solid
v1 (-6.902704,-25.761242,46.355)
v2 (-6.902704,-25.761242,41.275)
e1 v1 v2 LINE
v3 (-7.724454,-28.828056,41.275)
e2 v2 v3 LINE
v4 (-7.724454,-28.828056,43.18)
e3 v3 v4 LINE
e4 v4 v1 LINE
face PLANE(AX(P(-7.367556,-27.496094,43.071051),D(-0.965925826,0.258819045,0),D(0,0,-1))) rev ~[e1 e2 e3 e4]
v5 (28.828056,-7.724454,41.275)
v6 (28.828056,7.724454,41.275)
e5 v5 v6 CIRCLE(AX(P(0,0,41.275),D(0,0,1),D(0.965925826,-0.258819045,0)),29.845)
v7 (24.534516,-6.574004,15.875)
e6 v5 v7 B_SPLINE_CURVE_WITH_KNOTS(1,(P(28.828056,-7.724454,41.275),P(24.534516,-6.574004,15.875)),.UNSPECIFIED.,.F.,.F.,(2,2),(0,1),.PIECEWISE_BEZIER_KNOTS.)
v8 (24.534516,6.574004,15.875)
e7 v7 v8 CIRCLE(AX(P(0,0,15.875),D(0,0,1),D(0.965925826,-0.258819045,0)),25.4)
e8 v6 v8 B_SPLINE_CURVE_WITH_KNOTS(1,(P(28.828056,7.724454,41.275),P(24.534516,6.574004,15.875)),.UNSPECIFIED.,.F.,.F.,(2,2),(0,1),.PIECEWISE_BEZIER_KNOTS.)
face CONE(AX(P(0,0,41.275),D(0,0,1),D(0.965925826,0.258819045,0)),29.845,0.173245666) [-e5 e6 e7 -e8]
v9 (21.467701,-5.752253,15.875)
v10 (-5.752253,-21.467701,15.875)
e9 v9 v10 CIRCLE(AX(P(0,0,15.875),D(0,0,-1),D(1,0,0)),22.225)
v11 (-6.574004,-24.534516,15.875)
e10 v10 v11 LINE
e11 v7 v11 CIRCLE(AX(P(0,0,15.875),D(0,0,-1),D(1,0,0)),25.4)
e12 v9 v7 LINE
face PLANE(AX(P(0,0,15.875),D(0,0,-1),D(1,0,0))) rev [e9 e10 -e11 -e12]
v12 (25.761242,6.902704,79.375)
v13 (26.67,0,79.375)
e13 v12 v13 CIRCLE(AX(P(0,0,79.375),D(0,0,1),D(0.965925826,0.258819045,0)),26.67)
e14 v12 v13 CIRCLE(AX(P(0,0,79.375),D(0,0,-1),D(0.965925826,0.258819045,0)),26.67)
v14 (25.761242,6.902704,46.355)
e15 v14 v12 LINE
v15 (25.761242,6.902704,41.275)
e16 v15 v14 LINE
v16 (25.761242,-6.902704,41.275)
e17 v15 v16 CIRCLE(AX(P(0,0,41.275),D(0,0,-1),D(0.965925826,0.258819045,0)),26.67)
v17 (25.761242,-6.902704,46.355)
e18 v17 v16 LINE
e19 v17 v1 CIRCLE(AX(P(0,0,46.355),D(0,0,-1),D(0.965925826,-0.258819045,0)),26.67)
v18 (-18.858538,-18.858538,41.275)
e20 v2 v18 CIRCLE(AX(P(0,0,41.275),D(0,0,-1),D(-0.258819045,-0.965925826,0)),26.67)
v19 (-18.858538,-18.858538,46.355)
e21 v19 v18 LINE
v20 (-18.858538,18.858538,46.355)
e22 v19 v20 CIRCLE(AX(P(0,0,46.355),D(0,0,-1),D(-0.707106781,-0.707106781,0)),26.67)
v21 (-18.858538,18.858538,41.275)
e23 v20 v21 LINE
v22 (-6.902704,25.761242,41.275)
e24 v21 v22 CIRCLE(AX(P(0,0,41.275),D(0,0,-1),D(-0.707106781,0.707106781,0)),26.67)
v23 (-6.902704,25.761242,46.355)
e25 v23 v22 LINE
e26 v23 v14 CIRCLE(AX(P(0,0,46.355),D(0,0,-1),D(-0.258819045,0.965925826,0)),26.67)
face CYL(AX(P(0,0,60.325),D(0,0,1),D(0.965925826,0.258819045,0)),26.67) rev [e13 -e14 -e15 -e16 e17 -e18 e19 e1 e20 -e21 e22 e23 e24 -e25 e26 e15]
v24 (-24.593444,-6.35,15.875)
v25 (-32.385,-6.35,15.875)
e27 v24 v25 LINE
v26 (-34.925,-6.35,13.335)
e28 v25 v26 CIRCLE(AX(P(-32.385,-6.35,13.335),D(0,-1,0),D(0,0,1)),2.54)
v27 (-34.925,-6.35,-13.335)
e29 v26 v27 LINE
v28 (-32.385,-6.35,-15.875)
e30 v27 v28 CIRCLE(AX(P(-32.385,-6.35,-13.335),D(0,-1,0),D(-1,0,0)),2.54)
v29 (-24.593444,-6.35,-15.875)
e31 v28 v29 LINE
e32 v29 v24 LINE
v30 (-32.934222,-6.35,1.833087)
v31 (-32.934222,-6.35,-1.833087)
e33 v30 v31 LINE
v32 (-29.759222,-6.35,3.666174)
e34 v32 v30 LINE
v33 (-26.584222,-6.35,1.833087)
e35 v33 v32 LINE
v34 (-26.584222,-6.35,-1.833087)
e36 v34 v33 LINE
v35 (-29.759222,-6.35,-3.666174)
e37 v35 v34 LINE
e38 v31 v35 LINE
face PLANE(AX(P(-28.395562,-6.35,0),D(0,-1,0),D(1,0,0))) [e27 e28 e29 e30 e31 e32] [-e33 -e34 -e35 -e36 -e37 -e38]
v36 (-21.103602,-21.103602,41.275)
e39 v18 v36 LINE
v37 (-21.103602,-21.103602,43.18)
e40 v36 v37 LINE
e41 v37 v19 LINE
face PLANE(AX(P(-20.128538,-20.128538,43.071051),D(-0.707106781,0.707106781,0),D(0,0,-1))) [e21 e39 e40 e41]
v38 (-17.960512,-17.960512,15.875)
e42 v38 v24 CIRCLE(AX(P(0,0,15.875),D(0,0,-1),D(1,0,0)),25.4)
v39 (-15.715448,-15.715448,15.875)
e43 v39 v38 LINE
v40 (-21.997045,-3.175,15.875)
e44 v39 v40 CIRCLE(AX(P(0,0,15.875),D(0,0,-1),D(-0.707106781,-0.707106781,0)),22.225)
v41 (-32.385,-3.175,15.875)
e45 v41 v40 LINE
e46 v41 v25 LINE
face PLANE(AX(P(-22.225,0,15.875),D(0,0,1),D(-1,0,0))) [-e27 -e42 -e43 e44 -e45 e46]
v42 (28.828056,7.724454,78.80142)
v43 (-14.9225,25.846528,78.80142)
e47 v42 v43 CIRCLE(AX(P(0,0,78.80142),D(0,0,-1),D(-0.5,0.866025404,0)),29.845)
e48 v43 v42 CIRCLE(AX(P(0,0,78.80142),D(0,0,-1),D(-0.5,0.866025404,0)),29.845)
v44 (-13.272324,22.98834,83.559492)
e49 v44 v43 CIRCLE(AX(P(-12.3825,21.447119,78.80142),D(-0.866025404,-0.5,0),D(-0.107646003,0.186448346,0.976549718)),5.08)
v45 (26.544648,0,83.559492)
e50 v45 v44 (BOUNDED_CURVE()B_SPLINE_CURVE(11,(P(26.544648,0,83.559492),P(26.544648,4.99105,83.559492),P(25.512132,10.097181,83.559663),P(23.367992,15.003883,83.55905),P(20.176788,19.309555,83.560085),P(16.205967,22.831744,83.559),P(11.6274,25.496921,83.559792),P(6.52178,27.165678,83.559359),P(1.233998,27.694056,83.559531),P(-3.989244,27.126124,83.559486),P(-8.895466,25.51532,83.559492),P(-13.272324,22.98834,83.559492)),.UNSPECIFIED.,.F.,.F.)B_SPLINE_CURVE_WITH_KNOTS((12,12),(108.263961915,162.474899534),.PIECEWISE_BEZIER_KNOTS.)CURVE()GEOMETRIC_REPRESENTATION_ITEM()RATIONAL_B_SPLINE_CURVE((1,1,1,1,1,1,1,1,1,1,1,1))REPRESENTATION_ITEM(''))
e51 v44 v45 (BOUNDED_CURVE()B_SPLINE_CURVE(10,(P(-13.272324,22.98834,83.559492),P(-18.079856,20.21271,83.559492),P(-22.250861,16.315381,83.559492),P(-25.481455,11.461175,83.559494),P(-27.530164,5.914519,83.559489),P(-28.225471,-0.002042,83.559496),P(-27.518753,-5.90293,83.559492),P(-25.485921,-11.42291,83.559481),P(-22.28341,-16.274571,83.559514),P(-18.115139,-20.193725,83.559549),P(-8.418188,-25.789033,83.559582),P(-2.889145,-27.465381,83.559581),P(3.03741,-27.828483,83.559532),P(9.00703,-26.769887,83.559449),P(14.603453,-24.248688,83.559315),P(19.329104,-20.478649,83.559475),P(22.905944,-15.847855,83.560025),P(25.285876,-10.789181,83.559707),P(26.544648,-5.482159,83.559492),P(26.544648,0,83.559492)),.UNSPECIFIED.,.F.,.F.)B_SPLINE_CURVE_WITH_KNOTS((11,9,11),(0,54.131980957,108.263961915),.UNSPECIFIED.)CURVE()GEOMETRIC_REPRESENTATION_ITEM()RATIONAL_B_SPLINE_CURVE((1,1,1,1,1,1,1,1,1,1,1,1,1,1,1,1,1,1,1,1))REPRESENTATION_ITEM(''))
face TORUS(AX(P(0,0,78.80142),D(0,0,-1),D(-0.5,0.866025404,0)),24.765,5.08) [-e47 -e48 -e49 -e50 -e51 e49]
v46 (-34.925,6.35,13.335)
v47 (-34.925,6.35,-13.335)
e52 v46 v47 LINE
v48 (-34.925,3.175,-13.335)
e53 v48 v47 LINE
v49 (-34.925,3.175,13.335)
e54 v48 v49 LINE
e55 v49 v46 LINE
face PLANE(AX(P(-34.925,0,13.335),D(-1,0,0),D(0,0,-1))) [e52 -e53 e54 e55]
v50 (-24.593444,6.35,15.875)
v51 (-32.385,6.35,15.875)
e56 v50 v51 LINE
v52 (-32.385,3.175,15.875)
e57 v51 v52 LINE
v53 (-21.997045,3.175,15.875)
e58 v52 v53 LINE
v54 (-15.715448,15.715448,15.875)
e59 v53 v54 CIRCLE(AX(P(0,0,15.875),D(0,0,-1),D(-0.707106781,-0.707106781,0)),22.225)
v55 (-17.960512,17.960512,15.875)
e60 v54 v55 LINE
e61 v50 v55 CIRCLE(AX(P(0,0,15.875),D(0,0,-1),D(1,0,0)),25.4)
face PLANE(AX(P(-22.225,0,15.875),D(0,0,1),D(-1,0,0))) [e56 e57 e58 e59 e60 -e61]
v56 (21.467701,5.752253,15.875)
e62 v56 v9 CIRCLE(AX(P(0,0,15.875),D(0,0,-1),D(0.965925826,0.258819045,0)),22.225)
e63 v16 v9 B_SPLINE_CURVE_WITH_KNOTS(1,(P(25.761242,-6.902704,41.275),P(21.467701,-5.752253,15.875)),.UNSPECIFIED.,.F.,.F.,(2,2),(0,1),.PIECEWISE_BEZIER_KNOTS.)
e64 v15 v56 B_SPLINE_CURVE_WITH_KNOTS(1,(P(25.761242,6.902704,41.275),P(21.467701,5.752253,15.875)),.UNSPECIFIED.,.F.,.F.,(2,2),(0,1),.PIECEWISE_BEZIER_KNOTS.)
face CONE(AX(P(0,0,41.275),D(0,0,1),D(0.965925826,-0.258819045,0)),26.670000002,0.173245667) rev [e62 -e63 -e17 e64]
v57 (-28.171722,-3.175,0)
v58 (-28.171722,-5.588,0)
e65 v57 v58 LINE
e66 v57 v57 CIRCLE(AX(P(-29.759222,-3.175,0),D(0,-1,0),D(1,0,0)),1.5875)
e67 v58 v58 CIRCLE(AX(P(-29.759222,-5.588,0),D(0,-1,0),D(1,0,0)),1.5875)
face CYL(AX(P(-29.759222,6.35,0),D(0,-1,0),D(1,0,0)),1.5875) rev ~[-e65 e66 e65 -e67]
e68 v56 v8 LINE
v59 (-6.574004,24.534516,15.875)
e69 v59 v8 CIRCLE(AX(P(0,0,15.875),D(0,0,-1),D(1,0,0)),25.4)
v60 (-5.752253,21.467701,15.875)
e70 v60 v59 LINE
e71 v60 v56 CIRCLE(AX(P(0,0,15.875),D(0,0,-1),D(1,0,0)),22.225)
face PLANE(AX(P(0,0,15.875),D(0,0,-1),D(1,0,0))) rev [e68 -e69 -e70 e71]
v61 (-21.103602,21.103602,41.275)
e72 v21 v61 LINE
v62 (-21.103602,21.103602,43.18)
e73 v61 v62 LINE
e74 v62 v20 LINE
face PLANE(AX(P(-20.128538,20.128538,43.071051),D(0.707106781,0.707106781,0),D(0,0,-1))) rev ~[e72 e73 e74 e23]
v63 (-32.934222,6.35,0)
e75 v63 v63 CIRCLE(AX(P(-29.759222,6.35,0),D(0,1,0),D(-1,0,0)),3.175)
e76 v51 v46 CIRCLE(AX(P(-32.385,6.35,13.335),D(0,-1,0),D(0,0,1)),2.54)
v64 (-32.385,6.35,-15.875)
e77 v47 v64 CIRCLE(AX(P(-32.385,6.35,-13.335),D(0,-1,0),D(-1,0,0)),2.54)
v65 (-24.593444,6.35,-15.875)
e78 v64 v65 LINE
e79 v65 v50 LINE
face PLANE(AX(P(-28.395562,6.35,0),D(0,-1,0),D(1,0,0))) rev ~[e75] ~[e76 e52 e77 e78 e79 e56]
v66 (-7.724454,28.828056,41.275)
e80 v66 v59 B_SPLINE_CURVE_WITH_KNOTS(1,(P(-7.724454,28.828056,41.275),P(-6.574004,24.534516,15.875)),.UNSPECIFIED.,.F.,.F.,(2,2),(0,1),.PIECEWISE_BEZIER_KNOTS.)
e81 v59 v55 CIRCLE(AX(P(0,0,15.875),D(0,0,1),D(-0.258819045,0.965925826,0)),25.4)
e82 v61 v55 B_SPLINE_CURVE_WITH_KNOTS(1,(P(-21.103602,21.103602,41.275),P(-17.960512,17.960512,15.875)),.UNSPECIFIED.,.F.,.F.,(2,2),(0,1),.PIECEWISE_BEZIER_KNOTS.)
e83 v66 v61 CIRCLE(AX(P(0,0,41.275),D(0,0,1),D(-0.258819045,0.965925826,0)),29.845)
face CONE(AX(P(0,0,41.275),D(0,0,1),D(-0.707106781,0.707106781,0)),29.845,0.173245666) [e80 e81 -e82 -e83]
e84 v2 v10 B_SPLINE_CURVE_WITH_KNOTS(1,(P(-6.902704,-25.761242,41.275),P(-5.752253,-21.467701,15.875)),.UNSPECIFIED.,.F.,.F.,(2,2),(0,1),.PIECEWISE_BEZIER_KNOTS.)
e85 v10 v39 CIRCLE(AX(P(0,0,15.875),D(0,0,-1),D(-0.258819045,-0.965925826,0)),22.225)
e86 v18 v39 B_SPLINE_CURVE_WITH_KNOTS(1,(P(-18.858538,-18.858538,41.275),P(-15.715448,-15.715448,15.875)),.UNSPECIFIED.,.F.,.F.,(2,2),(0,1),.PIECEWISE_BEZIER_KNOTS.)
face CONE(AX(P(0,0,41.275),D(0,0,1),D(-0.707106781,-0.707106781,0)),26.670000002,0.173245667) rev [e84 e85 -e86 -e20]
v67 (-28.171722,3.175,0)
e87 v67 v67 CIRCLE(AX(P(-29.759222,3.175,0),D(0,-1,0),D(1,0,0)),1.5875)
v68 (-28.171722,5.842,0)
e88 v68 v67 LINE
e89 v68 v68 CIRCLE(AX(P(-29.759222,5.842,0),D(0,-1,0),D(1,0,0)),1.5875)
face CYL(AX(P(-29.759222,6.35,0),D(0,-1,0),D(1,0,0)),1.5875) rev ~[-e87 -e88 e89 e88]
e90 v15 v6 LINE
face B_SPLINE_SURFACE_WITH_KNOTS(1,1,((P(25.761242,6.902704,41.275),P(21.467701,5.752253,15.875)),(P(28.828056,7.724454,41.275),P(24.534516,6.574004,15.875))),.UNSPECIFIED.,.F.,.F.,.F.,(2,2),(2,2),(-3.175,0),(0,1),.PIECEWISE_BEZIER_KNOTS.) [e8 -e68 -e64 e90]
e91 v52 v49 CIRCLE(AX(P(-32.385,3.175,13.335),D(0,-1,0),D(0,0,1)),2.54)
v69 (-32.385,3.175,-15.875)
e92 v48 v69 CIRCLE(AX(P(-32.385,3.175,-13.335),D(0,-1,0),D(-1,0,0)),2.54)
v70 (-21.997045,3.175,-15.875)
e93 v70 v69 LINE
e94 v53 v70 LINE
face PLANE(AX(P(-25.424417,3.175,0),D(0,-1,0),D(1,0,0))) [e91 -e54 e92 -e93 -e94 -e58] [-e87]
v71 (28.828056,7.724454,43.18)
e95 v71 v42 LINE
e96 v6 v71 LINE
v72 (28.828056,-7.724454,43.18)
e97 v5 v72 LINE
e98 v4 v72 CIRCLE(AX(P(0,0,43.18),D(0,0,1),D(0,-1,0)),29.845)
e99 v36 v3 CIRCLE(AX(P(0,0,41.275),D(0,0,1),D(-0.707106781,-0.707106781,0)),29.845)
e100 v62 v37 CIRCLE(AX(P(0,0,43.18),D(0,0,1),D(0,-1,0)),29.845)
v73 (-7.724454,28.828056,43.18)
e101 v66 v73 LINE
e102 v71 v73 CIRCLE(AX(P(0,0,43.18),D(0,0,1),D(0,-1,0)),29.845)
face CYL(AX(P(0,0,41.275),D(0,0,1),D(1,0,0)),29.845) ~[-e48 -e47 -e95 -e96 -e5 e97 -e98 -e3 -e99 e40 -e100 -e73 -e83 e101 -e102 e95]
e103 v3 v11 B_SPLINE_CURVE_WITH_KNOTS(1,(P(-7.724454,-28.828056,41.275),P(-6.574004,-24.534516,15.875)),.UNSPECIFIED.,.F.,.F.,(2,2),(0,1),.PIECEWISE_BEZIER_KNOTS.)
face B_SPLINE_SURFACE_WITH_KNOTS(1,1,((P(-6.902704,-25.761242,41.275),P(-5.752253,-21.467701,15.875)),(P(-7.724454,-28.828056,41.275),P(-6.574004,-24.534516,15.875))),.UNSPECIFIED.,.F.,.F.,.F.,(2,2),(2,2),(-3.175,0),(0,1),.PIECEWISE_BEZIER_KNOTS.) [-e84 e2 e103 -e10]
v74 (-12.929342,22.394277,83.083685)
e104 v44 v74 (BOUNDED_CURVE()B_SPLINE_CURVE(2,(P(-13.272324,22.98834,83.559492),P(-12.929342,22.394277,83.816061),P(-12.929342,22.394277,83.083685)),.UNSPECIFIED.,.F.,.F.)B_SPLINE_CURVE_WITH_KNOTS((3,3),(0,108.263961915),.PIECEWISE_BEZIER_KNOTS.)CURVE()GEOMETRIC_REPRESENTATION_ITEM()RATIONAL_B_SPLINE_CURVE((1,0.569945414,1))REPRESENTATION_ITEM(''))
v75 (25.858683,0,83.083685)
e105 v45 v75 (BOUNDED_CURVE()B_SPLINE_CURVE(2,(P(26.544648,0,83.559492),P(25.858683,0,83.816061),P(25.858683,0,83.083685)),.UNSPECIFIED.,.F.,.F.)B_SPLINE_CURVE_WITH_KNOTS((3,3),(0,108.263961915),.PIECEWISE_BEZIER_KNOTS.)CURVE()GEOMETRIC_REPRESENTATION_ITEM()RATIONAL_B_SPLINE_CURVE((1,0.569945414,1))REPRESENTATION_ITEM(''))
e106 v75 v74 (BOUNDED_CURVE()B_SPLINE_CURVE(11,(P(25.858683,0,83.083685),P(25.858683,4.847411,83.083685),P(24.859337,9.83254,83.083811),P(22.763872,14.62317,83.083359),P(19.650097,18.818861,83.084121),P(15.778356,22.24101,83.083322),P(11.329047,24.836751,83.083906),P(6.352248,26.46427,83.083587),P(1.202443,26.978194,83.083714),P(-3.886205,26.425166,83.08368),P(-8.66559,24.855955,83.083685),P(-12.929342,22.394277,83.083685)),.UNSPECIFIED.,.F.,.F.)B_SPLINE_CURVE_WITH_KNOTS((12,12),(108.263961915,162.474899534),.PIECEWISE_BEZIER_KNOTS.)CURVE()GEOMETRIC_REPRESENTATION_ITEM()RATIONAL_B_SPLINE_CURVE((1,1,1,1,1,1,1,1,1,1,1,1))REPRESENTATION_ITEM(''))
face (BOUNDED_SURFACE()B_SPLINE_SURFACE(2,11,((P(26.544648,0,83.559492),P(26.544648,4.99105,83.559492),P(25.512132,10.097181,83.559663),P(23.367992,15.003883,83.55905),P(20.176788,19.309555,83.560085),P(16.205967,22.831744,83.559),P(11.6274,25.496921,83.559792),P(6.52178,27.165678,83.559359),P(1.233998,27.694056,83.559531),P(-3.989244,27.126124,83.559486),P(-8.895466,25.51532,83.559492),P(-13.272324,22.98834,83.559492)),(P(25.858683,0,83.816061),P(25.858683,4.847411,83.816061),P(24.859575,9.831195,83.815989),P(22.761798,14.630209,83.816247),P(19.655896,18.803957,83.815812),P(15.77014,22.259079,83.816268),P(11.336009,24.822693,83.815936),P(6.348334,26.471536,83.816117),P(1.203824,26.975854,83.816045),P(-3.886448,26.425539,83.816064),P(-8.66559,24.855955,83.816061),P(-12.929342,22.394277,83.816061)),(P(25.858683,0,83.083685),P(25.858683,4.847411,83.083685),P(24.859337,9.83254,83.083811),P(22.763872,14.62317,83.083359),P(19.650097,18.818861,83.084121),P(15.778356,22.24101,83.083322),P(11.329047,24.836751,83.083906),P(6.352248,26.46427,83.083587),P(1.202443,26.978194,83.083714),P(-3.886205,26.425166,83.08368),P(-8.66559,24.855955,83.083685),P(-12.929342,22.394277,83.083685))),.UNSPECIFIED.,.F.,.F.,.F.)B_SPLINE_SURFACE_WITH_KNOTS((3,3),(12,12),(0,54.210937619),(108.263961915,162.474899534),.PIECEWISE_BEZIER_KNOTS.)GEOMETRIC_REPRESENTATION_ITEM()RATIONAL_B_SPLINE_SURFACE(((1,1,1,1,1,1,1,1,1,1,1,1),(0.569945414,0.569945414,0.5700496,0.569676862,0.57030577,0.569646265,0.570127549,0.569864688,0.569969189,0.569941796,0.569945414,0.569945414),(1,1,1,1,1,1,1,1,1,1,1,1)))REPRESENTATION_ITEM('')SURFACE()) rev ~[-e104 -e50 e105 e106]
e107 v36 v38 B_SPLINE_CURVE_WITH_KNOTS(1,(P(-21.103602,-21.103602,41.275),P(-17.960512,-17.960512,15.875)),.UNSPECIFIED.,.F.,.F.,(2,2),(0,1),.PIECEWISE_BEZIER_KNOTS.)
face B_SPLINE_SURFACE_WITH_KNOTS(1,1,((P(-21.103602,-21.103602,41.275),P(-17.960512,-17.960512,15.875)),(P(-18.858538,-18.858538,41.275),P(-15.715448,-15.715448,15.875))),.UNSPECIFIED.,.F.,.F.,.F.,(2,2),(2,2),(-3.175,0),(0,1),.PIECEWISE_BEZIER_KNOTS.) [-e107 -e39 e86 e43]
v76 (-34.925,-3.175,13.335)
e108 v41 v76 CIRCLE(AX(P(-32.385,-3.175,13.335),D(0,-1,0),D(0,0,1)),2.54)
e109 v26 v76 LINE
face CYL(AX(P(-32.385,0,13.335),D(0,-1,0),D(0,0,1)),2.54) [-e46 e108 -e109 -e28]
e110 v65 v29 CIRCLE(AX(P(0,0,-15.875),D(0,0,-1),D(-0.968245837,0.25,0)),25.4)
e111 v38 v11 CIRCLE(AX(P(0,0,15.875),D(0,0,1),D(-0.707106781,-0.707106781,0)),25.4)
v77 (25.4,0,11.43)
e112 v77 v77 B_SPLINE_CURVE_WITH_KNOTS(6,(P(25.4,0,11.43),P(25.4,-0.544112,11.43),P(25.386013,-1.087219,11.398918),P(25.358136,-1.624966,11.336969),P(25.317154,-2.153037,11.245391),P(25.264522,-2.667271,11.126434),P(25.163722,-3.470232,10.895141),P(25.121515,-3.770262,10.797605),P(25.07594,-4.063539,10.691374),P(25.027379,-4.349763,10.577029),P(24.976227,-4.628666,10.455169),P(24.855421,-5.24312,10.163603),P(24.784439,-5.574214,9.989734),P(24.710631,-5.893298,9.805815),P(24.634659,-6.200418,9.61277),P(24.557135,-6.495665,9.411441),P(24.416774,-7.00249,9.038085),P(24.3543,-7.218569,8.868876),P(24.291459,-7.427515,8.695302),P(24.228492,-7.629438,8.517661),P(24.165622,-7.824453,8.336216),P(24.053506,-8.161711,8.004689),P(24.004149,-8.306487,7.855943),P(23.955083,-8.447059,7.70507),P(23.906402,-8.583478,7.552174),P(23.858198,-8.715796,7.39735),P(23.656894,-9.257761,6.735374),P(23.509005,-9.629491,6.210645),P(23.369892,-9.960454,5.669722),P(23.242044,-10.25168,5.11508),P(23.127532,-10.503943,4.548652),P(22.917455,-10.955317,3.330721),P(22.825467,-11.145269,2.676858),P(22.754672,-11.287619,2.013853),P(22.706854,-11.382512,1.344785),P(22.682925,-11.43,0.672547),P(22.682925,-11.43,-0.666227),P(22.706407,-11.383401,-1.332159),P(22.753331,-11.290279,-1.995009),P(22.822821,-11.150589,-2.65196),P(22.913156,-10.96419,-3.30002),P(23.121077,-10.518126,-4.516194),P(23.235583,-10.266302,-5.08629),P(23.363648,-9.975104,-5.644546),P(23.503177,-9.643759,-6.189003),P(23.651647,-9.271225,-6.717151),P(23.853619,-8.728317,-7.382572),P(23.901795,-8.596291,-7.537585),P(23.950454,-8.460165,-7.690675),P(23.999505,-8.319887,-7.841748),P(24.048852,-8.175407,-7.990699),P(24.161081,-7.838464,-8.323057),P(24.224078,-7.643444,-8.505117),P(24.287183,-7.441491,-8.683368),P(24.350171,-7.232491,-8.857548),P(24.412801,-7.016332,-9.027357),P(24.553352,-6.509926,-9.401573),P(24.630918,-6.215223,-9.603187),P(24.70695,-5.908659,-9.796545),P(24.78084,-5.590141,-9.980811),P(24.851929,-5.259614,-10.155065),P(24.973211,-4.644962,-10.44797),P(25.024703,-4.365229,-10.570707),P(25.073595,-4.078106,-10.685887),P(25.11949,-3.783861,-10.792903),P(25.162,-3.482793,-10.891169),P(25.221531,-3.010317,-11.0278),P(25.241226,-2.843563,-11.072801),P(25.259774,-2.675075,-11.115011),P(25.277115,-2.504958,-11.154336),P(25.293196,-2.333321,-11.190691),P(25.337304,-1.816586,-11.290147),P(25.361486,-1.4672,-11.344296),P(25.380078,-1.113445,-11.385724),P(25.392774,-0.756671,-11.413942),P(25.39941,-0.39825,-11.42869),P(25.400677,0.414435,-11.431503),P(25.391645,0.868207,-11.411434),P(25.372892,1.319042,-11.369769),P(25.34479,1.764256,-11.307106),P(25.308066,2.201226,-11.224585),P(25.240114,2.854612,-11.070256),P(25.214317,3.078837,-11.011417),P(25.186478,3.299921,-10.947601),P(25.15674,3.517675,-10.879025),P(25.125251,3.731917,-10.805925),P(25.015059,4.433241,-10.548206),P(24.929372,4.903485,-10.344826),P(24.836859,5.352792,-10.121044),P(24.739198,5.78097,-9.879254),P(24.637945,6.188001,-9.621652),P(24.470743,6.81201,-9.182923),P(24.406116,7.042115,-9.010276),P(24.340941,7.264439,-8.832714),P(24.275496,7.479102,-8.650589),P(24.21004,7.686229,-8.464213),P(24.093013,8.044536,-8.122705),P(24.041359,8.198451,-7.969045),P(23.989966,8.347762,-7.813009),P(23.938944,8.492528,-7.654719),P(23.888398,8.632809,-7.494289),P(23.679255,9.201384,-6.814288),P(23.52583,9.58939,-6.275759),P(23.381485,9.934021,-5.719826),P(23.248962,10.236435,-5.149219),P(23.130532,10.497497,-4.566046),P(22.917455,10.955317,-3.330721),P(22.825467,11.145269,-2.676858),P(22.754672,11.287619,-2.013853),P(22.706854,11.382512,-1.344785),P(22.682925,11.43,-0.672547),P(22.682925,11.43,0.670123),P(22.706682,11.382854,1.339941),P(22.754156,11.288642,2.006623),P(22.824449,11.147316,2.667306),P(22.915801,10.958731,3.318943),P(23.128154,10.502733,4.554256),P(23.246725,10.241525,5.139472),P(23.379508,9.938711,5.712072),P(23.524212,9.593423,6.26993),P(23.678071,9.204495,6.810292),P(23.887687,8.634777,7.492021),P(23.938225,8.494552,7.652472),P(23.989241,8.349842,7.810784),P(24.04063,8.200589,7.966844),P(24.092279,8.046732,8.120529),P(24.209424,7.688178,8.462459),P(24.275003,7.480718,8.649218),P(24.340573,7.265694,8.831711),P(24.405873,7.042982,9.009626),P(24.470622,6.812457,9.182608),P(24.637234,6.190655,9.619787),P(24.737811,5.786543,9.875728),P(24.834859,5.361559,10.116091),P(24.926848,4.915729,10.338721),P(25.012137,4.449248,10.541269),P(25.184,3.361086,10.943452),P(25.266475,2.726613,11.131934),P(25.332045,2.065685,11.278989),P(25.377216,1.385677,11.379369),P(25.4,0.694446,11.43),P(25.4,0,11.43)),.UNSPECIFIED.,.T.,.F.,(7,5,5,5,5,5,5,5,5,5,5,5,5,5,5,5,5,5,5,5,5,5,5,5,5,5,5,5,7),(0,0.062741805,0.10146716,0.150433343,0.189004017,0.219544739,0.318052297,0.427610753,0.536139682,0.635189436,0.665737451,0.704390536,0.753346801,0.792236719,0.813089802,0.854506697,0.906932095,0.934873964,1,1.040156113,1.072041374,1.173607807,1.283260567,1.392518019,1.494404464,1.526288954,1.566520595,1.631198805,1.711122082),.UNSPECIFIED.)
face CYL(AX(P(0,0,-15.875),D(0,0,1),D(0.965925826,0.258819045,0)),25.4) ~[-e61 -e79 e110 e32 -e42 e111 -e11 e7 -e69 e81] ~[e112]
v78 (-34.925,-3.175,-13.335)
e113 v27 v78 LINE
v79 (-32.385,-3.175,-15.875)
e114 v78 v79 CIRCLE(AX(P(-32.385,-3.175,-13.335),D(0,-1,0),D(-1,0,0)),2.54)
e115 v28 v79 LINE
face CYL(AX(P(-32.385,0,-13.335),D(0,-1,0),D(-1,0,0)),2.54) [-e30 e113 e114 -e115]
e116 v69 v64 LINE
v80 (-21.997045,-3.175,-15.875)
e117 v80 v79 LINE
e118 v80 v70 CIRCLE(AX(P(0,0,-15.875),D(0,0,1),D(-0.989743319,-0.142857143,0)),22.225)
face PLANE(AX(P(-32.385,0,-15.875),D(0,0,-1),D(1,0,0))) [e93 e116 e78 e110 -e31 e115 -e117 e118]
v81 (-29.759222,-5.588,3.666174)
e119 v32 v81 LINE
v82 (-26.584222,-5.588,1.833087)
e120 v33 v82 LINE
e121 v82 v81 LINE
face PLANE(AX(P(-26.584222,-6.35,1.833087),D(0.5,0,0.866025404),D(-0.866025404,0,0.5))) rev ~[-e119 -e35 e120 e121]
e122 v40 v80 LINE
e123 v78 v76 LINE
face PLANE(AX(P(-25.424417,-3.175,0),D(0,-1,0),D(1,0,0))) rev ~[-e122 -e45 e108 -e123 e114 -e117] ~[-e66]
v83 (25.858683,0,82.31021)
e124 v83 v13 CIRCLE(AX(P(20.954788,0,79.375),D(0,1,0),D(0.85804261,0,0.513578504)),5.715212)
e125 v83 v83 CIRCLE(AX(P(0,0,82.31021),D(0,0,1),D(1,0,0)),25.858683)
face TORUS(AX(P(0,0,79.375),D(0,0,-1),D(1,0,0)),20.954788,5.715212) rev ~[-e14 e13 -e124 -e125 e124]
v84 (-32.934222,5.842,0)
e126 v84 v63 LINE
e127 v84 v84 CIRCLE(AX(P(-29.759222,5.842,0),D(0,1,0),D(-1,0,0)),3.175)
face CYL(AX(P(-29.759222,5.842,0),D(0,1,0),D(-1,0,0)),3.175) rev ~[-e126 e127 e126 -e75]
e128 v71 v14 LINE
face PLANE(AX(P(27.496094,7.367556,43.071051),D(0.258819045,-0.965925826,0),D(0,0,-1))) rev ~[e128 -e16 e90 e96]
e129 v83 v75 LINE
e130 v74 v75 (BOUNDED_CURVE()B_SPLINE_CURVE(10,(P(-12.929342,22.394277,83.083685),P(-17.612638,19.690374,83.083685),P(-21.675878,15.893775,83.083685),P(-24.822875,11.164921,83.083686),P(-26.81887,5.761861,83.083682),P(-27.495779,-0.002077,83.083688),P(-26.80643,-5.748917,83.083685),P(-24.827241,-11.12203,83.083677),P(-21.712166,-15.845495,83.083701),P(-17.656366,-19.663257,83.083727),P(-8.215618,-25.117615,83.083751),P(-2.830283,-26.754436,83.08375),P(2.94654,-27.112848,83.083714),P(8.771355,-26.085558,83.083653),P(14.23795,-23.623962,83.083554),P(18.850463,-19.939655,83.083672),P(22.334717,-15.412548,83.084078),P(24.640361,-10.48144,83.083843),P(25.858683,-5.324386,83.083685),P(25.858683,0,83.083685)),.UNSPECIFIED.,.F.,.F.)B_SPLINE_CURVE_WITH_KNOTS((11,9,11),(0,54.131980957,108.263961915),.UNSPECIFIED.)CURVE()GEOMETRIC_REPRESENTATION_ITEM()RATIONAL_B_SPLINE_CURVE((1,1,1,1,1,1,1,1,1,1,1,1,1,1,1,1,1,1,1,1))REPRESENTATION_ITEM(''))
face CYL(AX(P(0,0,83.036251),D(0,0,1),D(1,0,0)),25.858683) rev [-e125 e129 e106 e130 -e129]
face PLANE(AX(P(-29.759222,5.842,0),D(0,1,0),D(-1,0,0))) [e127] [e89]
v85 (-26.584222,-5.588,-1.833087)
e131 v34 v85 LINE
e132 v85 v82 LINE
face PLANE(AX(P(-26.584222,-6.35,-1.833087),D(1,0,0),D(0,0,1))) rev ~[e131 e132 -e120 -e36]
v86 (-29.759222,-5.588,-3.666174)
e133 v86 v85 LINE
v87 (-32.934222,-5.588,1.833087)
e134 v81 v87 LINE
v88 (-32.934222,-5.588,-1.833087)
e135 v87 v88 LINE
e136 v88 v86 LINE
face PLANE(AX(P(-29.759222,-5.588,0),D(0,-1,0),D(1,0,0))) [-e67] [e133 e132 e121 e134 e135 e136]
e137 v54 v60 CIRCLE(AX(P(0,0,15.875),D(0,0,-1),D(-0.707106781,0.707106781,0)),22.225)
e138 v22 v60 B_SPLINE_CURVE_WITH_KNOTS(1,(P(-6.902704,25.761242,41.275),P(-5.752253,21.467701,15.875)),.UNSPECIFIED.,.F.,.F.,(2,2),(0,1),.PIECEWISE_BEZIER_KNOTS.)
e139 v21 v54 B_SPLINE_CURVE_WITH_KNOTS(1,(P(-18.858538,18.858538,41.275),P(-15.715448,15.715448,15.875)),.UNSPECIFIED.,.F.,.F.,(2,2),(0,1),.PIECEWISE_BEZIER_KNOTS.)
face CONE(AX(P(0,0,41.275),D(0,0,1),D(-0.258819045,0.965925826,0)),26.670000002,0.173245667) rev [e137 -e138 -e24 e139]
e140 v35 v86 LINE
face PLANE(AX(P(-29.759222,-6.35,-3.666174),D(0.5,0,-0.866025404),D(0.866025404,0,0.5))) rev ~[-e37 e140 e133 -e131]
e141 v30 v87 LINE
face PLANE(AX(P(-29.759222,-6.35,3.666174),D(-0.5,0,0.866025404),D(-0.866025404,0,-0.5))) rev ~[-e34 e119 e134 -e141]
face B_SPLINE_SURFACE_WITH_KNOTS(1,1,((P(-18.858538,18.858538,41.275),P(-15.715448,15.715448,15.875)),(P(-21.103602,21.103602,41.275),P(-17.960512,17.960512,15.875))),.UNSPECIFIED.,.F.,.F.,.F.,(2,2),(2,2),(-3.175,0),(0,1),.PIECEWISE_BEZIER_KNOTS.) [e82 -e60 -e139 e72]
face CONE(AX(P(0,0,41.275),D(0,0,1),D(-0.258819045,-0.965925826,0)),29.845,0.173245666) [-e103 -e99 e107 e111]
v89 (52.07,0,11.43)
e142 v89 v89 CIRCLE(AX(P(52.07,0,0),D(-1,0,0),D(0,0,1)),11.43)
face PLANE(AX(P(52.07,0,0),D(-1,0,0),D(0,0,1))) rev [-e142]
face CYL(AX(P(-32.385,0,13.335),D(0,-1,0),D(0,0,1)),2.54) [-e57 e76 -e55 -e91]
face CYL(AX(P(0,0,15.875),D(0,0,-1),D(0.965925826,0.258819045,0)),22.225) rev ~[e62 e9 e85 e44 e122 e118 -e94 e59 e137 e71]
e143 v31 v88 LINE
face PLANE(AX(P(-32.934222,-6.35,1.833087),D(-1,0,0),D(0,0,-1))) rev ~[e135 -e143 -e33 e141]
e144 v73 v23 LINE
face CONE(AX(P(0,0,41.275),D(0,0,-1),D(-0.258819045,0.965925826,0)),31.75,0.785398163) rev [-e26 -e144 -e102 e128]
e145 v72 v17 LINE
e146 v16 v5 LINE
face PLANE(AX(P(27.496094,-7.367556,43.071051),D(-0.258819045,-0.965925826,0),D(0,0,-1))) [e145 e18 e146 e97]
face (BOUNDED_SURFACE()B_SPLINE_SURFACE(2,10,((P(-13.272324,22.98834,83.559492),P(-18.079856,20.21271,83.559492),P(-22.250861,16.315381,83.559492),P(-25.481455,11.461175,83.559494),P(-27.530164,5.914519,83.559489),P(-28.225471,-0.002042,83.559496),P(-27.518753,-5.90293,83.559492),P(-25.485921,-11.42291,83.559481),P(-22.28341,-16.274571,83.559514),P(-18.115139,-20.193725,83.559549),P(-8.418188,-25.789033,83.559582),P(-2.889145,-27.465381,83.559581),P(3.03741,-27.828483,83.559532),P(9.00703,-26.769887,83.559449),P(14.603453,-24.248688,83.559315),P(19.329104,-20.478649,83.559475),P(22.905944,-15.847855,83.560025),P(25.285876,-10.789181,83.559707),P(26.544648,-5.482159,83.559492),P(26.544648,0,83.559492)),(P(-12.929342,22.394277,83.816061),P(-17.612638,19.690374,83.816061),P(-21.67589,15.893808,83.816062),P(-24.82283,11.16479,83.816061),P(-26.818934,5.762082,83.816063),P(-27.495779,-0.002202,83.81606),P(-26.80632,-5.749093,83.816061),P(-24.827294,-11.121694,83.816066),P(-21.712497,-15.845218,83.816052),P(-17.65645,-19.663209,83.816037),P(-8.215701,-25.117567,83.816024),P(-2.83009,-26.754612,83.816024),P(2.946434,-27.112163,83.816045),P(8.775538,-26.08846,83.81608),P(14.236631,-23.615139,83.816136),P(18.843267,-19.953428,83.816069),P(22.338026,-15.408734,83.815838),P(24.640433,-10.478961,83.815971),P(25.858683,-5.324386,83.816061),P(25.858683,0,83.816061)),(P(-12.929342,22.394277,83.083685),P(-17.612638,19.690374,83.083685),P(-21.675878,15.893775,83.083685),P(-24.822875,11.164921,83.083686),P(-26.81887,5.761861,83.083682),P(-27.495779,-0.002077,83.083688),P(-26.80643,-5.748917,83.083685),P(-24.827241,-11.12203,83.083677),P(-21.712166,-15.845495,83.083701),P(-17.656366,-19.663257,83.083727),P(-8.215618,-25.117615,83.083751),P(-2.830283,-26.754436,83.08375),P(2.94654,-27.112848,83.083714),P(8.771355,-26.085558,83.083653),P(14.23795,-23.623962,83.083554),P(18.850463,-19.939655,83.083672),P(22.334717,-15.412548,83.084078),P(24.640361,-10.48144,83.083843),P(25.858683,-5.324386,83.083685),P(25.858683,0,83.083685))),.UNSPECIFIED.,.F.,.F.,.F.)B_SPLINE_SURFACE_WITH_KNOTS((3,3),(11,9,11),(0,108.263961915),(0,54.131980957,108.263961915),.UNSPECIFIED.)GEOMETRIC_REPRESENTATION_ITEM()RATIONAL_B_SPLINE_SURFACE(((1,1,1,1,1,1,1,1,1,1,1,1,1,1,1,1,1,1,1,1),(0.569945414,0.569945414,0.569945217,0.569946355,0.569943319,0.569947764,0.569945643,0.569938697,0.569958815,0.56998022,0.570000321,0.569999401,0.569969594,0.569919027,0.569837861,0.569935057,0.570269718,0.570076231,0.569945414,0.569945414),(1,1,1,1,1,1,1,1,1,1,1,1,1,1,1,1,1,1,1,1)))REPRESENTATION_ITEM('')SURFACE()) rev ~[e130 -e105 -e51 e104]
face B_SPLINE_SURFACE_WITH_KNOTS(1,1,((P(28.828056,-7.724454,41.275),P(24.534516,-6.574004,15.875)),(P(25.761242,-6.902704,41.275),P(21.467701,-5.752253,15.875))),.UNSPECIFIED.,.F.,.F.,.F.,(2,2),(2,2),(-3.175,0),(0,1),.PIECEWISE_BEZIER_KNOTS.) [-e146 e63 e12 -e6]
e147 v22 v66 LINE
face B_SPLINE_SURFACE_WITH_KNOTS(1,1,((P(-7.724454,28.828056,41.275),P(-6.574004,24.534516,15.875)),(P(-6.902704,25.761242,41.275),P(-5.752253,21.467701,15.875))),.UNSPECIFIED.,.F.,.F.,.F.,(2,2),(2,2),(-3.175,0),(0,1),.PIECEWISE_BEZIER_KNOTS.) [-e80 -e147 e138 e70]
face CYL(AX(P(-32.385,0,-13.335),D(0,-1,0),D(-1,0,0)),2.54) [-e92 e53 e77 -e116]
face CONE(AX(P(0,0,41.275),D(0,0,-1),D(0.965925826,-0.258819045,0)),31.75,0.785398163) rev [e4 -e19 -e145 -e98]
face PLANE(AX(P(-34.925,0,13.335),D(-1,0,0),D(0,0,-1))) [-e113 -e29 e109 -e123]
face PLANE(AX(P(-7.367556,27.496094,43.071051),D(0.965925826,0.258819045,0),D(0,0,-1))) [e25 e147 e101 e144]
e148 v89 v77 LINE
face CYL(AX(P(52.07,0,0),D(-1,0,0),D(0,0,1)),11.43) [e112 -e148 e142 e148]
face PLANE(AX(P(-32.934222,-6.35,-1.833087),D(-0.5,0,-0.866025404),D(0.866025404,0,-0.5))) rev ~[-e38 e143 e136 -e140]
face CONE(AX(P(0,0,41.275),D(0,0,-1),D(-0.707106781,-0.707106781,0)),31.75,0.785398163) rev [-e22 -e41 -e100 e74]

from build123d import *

# Parameters (mm, degrees)
F0_W           = 3.175
F0_H           = 38.1
F1_ANGLE_BACK  = 15
F1_ANGLE       = 30
F0_H_2         = 15.875
F0_H_3         = 11.43
F0_H_4         = 4.445
F0_W_2         = 3.9863166107
F0_H_5         = 1.4520821328
F5_COUNT       = 3
F5_ANGLE       = 240
F6_DEPTH       = 6.35
F0_W_3         = 17.383622241
F0_H_6         = 31.75
F7_DEPTH       = 3.175
F9_D           = 3.175
F9_CBORE_D     = 6.35
F9_CBORE_DEPTH = 0.508
F10_R          = 1.5875
F11_DEPTH      = 0.762
F13_R          = 0.508
F15_T2_ANGLE   = 90
F15_T4_ANGLE   = 90
F15_T6_ANGLE   = 90
F0_W_4         = 26.67


# Not quite as in the source:
# - a fillet or chamfer that OpenCascade refuses, or shapes differently, is made with other operations: its cross-section is extruded or revolved along the edge and cut away or added


with BuildPart() as f1:
    # F0 (on Front) → F1 (revolve)
    with BuildSketch(Plane.XZ, mode=Mode.PRIVATE) as f1_sk:
        with Locations((28.2575, 60.325)):
            Rectangle(F0_W, F0_H)
    revolve(f1_sk.sketch.rotate(Axis((0, 0, 31.75), (0, 0, -1)), -F1_ANGLE_BACK), axis=Axis((0, 0, 31.75), (0, 0, -1)), revolution_arc=F1_ANGLE)



with BuildPart() as f1b:
    # F0 (on Front) → F1, piece 2 (revolve)
    with BuildSketch(Plane.XZ, mode=Mode.PRIVATE) as f1_sk:
        with Locations((23.8125, -7.9375)):
            Rectangle(F0_W, F0_H_2)
        with Locations((23.8125, 5.715)):
            Rectangle(F0_W, F0_H_3)
        with Locations((23.8125, 13.6525)):
            Rectangle(F0_W, F0_H_4)
    revolve(f1_sk.sketch.rotate(Axis((0, 0, 31.75), (0, 0, -1)), -F1_ANGLE_BACK), axis=Axis((0, 0, 31.75), (0, 0, -1)), revolution_arc=F1_ANGLE)


with BuildPart() as f1_1:
    add(f1.part)

    add(f1b.part)  # F2 merges F1b
    # F1_face (on face) → F2 section 0
    with BuildSketch(Plane(origin=(27.9652046604, 0, 41.275), x_dir=(1, 0, 0), z_dir=(0, 0, -1))):
        with BuildLine():
            ThreePointArc((-2.2039628732, 6.9027039329), (-1.2952046604, 0), (-2.2039628732, -6.9027039329))
            Line((-2.2039628732, -6.9027039329), (0.8628516252, -7.7244544011))
            ThreePointArc((0.8628516252, -7.7244544011), (1.8797953396, 0), (0.8628516252, 7.7244544011))
            Line((0.8628516252, 7.7244544011), (-2.2039628732, 6.9027039329))
        make_face()
    # F1_face1 (on face) → F2 section 1
    with BuildSketch(Plane(origin=(23.5762929935, 0, 15.875), x_dir=(1, 0, 0), z_dir=(0, 0, 1))):
        with BuildLine():
            ThreePointArc((0.9582229943, -6.5740037456), (1.8237070065, 0), (0.9582229943, 6.5740037456))
            Line((0.9582229943, 6.5740037456), (-2.1085915042, 5.7522532774))
            ThreePointArc((-2.1085915042, 5.7522532774), (-1.3512929935, 0), (-2.1085915042, -5.7522532774))
            Line((-2.1085915042, -5.7522532774), (0.9582229943, -6.5740037456))
        make_face()
    loft()

    # F0 (on Front) → F3 (revolve)
    with BuildSketch(Plane.XZ):
        with Locations((28.2575, 60.325)):
            Rectangle(F0_W, F0_H)
        with Locations((23.8125, -7.9375)):
            Rectangle(F0_W, F0_H_2)
        with Locations((23.8125, 5.715)):
            Rectangle(F0_W, F0_H_3)
        with Locations((23.8125, 13.6525)):
            Rectangle(F0_W, F0_H_4)
        with BuildLine():
            ThreePointArc((25.8586833893, 82.3102101397), (26.4634380154, 80.8976369566), (26.67, 79.375))
            Line((26.67, 79.375), (29.845, 79.375))
            Line((29.845, 79.375), (29.845, 82.3102101397))
            Line((29.845, 82.3102101397), (25.8586833893, 82.3102101397))
        make_face()
        with Locations((27.8518416946, 83.0362512061)):
            Rectangle(F0_W_2, F0_H_5)
    revolve(axis=Axis((0, 0, 31.75), (0, 0, -1)))

    # F4: union 


with BuildPart() as f5_1:
    # F5: instance of F1
    add(f1_1.part.rotate(Axis((0, 0, 31.75), (0, 0, -1)), 1 * F5_ANGLE / (F5_COUNT - 1)))


with BuildPart() as f5_2:
    # F5: instance of F1
    add(f1_1.part.rotate(Axis((0, 0, 31.75), (0, 0, -1)), 2 * F5_ANGLE / (F5_COUNT - 1)))


with BuildPart() as f1_2:
    add(f1_1.part)

    add(f5_1.part)  # F6 merges F5_1

    add(f5_2.part)  # F6 merges F5_2
    # F0 (on Front) → F6 (join, symmetric)
    with BuildSketch(Plane.XZ):
        with BuildLine():
            Line((-32.385, -15.875), (-22.225, -15.875))
            Line((-22.225, -15.875), (-22.225, 15.875))
            Line((-22.225, 15.875), (-32.385, 15.875))
            ThreePointArc((-32.385, 15.875), (-34.1810512242, 15.1310512242), (-34.925, 13.335))
            Line((-34.925, 13.335), (-34.925, -13.335))
            ThreePointArc((-34.925, -13.335), (-34.1810512242, -15.1310512242), (-32.385, -15.875))
        make_face()
    extrude(amount=F6_DEPTH, both=True)

    # F0 (on Front) → F7 (cut, symmetric)
    with BuildSketch(Plane.XZ):
        with BuildLine():
            Line((-4.841377759, -29.4260326773), (-4.841377759, -15.875))
            Line((-4.841377759, -15.875), (-22.225, -15.875))
            Line((-22.225, -15.875), (-32.385, -15.875))
            ThreePointArc((-32.385, -15.875), (-34.1810512242, -15.1310512242), (-34.925, -13.335))
            Line((-34.925, -13.335), (-34.925, 13.335))
            ThreePointArc((-34.925, 13.335), (-34.1810512242, 15.1310512242), (-32.385, 15.875))
            Line((-32.385, 15.875), (-22.225, 15.875))
            Line((-22.225, 15.875), (-4.841377759, 15.875))
            Line((-4.841377759, 15.875), (-4.841377759, 29.4260326773))
            Line((-4.841377759, 29.4260326773), (-39.608622241, 29.4260326773))
            Line((-39.608622241, 29.4260326773), (-39.608622241, -29.4260326773))
            Line((-39.608622241, -29.4260326773), (-4.841377759, -29.4260326773))
        make_face()
        with Locations((-13.5331888795, 0)):
            Rectangle(F0_W_3, F0_H_6)
        with BuildLine():
            Line((-32.385, -15.875), (-22.225, -15.875))
            Line((-22.225, -15.875), (-22.225, 15.875))
            Line((-22.225, 15.875), (-32.385, 15.875))
            ThreePointArc((-32.385, 15.875), (-34.1810512242, 15.1310512242), (-34.925, 13.335))
            Line((-34.925, 13.335), (-34.925, -13.335))
            ThreePointArc((-34.925, -13.335), (-34.1810512242, -15.1310512242), (-32.385, -15.875))
        make_face()
    extrude(amount=F7_DEPTH, both=True, mode=Mode.SUBTRACT)

    # F9 (through all)
    with Locations(Plane(origin=(0, 6.35, 0), x_dir=(-1, 0, 0), z_dir=(0, 1, 0))):
        with Locations((29.7592221242, 0)):
            CounterBoreHole(F9_D / 2, F9_CBORE_D / 2, F9_CBORE_DEPTH)

    # F10 (on face) → F11 (cut)
    with BuildSketch(Plane.XZ.offset(6.35)):
        Polygon((-29.7592221242, -3.6661742094), (-26.5842221242, -1.8330871047), (-26.5842221242, 1.8330871047), (-29.7592221242, 3.6661742094), (-32.9342221242, 1.8330871047), (-32.9342221242, -1.8330871047), align=None)
        with Locations((-29.7592221242, 0)):
            Circle(F10_R, mode=Mode.SUBTRACT)
    extrude(amount=-F11_DEPTH, mode=Mode.SUBTRACT)

    # F12: fillet of radius 5.08 on 1 edges, made by hand

    # F12_s1 → F12_t2 (revolve, cut)
    with BuildSketch(Plane(origin=(0, 0, 0), x_dir=(0, 0, 1), z_dir=(-0.8660254038, -0.5, 0))):
        with BuildLine():
            ThreePointArc((83.7622922724, 25.8586833893), (81.9834385897, 28.7249439149), (78.8014197036, 29.845))
            Line((78.8014197036, 29.845), (83.7622922724, 29.845))
            Line((83.7622922724, 29.845), (83.7622922724, 25.8586833893))
        make_face()
    revolve(axis=Axis((0, 0, 83.7622922724), (0, 0, -1)), mode=Mode.SUBTRACT)

    # F13
    f13_edges = [f1_2.edges().sort_by_distance(p)[0] for p in [
        (12.929342, -22.394277, 83.762292),
    ]]
    fillet(f13_edges, radius=F13_R)

    # F14: union 

    # F15: chamfer of 5.08 on 3 edges, made by hand

    # F15_s1 → F15_t2 (revolve, cut)
    with BuildSketch(Plane(origin=(0, 0, 0), x_dir=(0, 0, 1), z_dir=(0.7071067812, -0.7071067812, 0))):
        Polygon((41.275, 31.75), (46.355, 26.67), (41.275, 26.67), align=None)
    revolve(axis=Axis((0, 0, 41.275), (0, 0, -1)), revolution_arc=F15_T2_ANGLE, mode=Mode.SUBTRACT)

    # F15_s3 → F15_t4 (revolve, cut)
    with BuildSketch(Plane(origin=(0, 0, 0), x_dir=(0, 0, 1), z_dir=(0.2588190451, 0.9659258263, 0))):
        Polygon((41.275, 31.75), (46.355, 26.67), (41.275, 26.67), align=None)
    revolve(axis=Axis((0, 0, 41.275), (0, 0, -1)), revolution_arc=F15_T4_ANGLE, mode=Mode.SUBTRACT)

    # F15_s5 → F15_t6 (revolve, cut)
    with BuildSketch(Plane(origin=(0, 0, 0), x_dir=(0, 0, 1), z_dir=(-0.9659258263, -0.2588190451, 0))):
        Polygon((41.275, 31.75), (46.355, 26.67), (41.275, 26.67), align=None)
    revolve(axis=Axis((0, 0, 41.275), (0, 0, -1)), revolution_arc=F15_T6_ANGLE, mode=Mode.SUBTRACT)

    # F0 (on Front) → F16 (revolve)
    with BuildSketch(Plane.XZ):
        with Locations((38.735, 5.715)):
            Rectangle(F0_W_4, F0_H_3)
        with Locations((23.8125, 5.715)):
            Rectangle(F0_W, F0_H_3)
    revolve(axis=Axis((38.735, 0, 0), (-1, 0, 0)))


solid = f1_2.part
